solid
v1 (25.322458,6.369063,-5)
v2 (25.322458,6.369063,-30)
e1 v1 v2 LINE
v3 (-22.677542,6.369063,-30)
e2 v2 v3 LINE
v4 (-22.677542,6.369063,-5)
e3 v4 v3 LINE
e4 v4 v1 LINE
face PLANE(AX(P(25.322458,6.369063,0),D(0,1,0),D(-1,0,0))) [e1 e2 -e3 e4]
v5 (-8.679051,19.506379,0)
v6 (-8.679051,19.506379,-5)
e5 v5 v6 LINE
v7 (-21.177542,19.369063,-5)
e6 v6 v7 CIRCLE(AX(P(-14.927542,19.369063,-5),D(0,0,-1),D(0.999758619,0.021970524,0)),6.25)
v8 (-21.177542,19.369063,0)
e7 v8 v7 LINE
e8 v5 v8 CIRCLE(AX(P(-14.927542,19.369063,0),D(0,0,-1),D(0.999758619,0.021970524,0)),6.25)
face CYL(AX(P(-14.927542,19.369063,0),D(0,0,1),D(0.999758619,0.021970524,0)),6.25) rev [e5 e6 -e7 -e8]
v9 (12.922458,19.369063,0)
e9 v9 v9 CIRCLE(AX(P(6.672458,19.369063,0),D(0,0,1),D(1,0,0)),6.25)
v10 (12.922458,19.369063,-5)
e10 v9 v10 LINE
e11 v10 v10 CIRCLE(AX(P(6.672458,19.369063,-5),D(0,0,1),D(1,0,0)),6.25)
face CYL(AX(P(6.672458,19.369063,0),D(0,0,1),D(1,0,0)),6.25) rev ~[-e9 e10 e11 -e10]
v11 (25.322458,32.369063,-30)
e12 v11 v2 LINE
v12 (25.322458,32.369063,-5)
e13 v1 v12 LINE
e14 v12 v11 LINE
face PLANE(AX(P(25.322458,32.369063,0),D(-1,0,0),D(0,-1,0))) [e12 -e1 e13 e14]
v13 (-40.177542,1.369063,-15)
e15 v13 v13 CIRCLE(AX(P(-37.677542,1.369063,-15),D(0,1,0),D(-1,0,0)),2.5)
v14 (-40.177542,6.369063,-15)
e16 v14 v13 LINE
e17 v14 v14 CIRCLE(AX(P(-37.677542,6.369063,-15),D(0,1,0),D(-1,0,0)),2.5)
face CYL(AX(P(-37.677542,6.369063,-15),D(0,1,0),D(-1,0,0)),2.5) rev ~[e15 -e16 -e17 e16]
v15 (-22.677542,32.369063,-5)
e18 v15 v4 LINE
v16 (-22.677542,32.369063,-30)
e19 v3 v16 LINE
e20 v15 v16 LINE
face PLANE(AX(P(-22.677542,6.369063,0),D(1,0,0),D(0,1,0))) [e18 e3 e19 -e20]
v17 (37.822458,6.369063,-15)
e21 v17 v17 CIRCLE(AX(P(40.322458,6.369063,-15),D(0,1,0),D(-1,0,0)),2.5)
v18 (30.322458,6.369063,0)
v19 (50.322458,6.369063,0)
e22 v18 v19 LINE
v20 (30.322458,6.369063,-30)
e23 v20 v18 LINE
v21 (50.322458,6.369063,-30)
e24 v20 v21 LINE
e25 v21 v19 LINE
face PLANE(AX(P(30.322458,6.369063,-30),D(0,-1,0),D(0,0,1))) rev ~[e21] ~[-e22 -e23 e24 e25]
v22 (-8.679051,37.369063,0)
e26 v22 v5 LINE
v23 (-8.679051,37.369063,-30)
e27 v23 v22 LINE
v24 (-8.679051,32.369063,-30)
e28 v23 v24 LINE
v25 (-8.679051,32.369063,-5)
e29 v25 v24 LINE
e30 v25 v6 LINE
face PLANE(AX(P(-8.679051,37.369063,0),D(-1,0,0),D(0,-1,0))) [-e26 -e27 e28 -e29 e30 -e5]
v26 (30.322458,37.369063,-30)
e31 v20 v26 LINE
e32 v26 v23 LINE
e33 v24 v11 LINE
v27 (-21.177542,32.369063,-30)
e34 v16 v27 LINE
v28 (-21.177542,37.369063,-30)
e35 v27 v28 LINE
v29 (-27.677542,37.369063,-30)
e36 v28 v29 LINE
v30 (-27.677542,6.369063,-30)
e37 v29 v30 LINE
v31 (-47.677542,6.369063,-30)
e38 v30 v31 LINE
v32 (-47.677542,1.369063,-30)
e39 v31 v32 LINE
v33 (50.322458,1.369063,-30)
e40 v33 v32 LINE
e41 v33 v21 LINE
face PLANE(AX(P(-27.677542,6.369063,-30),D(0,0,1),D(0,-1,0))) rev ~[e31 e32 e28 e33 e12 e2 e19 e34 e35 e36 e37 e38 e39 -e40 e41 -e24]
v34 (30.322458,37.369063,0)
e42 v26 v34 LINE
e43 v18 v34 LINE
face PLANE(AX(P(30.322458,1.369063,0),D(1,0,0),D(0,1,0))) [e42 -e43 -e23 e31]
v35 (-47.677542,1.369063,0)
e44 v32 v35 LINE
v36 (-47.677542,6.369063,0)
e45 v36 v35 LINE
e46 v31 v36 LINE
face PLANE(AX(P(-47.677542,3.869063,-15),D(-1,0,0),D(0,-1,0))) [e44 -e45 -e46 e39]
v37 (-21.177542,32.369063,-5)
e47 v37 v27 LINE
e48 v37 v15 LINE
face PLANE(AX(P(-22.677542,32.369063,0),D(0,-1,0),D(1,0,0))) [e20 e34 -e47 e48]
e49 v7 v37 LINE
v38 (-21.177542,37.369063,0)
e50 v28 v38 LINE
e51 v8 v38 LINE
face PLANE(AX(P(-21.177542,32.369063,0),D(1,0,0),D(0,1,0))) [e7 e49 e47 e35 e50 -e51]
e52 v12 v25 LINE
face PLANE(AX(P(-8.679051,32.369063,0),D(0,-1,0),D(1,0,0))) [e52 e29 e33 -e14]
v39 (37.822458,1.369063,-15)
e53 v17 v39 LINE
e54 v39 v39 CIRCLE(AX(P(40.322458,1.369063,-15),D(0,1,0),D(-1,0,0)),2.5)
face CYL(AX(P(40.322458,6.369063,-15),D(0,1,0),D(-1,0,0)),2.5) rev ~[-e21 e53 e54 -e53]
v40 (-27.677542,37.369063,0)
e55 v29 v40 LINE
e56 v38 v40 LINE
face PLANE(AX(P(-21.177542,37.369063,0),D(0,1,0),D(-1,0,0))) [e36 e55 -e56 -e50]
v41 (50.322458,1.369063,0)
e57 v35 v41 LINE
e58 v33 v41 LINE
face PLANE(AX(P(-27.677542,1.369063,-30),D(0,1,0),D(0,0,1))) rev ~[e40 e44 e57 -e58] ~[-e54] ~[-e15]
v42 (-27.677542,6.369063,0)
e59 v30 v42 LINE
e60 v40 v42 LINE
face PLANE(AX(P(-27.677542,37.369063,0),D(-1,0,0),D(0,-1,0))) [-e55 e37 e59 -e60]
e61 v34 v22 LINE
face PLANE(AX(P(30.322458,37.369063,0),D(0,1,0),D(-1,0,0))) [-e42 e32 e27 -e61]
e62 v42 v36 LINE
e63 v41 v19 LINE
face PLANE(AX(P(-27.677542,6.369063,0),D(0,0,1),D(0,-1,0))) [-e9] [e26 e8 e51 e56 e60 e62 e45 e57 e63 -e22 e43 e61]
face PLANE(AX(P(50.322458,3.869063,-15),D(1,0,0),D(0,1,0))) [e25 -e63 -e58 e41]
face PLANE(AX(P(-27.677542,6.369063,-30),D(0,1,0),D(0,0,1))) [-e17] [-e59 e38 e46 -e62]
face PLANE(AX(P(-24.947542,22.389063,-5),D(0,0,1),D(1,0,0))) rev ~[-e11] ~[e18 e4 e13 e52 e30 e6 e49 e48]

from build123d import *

# Parameters (mm, degrees)
F1_DEPTH = 30
F0_R     = 6.25
F2_DEPTH = 5
F3_W     = 5
F3_H     = 30
F4_DEPTH = 20
F5_W     = 5
F5_H     = 30
F6_DEPTH = 20
F7_R     = 2.5
F8_DEPTH = 25


# Not quite as in the source:
# - a feature names something its author has since deleted; it is built from what else it names


with BuildPart() as f1:
    # F0 (on Top) → F1 (new body)
    with BuildSketch(Plane.XY):
        Polygon((25.3224579843, 32.3690634753), (25.3224579843, 6.3690634753), (30.3224579843, 6.3690634753), (30.3224579843, 37.3690634753), (-8.6790506474, 37.3690634753), (-8.6790506474, 32.3690634753), align=None)
        Polygon((-22.6775420157, 6.3690634753), (-22.6775420157, 32.3690634753), (-21.1775420157, 32.3690634753), (-21.1775420157, 37.3690634753), (-27.6775420157, 37.3690634753), (-27.6775420157, 6.3690634753), align=None)
        Polygon((25.3224579843, 6.3690634753), (-22.6775420157, 6.3690634753), (-27.6775420157, 6.3690634753), (-27.6775420157, 1.3690634753), (30.3224579843, 1.3690634753), (30.3224579843, 6.3690634753), align=None)
    extrude(amount=-F1_DEPTH)

    # F0 (on Top) → F2 (join)
    with BuildSketch(Plane.XY):
        Polygon((-22.6775420157, 6.3690634753), (-22.6775420157, 32.3690634753), (-21.1775420157, 32.3690634753), (-21.1775420157, 37.3690634753), (-27.6775420157, 37.3690634753), (-27.6775420157, 6.3690634753), align=None)
        with BuildLine():
            Line((-21.1775420157, 32.3690634753), (-22.6775420157, 32.3690634753))
            Line((-22.6775420157, 32.3690634753), (-22.6775420157, 6.3690634753))
            Line((-22.6775420157, 6.3690634753), (25.3224579843, 6.3690634753))
            Line((25.3224579843, 6.3690634753), (25.3224579843, 32.3690634753))
            Line((25.3224579843, 32.3690634753), (-8.6790506474, 32.3690634753))
            Line((-8.6790506474, 32.3690634753), (-8.6790506474, 19.5063792474))
            ThreePointArc((-8.6790506474, 19.5063792474), (-14.858879986, 13.1194406446), (-21.1775420157, 19.3690634753))
            Line((-21.1775420157, 19.3690634753), (-21.1775420157, 32.3690634753))
        make_face()
        with Locations((6.6724579843, 19.3690634753)):
            Circle(F0_R, mode=Mode.SUBTRACT)
        Polygon((25.3224579843, 6.3690634753), (-22.6775420157, 6.3690634753), (-27.6775420157, 6.3690634753), (-27.6775420157, 1.3690634753), (30.3224579843, 1.3690634753), (30.3224579843, 6.3690634753), align=None)
        Polygon((25.3224579843, 32.3690634753), (25.3224579843, 6.3690634753), (30.3224579843, 6.3690634753), (30.3224579843, 37.3690634753), (-8.6790506474, 37.3690634753), (-8.6790506474, 32.3690634753), align=None)
    extrude(amount=-F2_DEPTH)

    # F3 (on face) → F4 (join)
    with BuildSketch(Plane.YZ.offset(30.3224579843)):
        with Locations((3.8690634753, -15)):
            Rectangle(F3_W, F3_H)
    extrude(amount=F4_DEPTH)

    # F5 (on face) → F6 (join)
    with BuildSketch(Plane(origin=(-27.6775420157, 0, 0), x_dir=(0, -1, 0), z_dir=(-1, 0, 0))):
        with Locations((-3.8690634753, -15)):
            Rectangle(F5_W, F5_H)
    extrude(amount=F6_DEPTH)

    # F7 (on face) → F8 (cut)
    with BuildSketch(Plane(origin=(0, 6.3690634753, 0), x_dir=(-1, 0, 0), z_dir=(0, 1, 0))):
        with Locations((-40.3224579843, -15)):
            Circle(F7_R)
        with Locations((37.6775420157, -15)):
            Circle(F7_R)
    extrude(amount=-F8_DEPTH, mode=Mode.SUBTRACT)


solid = f1.part
